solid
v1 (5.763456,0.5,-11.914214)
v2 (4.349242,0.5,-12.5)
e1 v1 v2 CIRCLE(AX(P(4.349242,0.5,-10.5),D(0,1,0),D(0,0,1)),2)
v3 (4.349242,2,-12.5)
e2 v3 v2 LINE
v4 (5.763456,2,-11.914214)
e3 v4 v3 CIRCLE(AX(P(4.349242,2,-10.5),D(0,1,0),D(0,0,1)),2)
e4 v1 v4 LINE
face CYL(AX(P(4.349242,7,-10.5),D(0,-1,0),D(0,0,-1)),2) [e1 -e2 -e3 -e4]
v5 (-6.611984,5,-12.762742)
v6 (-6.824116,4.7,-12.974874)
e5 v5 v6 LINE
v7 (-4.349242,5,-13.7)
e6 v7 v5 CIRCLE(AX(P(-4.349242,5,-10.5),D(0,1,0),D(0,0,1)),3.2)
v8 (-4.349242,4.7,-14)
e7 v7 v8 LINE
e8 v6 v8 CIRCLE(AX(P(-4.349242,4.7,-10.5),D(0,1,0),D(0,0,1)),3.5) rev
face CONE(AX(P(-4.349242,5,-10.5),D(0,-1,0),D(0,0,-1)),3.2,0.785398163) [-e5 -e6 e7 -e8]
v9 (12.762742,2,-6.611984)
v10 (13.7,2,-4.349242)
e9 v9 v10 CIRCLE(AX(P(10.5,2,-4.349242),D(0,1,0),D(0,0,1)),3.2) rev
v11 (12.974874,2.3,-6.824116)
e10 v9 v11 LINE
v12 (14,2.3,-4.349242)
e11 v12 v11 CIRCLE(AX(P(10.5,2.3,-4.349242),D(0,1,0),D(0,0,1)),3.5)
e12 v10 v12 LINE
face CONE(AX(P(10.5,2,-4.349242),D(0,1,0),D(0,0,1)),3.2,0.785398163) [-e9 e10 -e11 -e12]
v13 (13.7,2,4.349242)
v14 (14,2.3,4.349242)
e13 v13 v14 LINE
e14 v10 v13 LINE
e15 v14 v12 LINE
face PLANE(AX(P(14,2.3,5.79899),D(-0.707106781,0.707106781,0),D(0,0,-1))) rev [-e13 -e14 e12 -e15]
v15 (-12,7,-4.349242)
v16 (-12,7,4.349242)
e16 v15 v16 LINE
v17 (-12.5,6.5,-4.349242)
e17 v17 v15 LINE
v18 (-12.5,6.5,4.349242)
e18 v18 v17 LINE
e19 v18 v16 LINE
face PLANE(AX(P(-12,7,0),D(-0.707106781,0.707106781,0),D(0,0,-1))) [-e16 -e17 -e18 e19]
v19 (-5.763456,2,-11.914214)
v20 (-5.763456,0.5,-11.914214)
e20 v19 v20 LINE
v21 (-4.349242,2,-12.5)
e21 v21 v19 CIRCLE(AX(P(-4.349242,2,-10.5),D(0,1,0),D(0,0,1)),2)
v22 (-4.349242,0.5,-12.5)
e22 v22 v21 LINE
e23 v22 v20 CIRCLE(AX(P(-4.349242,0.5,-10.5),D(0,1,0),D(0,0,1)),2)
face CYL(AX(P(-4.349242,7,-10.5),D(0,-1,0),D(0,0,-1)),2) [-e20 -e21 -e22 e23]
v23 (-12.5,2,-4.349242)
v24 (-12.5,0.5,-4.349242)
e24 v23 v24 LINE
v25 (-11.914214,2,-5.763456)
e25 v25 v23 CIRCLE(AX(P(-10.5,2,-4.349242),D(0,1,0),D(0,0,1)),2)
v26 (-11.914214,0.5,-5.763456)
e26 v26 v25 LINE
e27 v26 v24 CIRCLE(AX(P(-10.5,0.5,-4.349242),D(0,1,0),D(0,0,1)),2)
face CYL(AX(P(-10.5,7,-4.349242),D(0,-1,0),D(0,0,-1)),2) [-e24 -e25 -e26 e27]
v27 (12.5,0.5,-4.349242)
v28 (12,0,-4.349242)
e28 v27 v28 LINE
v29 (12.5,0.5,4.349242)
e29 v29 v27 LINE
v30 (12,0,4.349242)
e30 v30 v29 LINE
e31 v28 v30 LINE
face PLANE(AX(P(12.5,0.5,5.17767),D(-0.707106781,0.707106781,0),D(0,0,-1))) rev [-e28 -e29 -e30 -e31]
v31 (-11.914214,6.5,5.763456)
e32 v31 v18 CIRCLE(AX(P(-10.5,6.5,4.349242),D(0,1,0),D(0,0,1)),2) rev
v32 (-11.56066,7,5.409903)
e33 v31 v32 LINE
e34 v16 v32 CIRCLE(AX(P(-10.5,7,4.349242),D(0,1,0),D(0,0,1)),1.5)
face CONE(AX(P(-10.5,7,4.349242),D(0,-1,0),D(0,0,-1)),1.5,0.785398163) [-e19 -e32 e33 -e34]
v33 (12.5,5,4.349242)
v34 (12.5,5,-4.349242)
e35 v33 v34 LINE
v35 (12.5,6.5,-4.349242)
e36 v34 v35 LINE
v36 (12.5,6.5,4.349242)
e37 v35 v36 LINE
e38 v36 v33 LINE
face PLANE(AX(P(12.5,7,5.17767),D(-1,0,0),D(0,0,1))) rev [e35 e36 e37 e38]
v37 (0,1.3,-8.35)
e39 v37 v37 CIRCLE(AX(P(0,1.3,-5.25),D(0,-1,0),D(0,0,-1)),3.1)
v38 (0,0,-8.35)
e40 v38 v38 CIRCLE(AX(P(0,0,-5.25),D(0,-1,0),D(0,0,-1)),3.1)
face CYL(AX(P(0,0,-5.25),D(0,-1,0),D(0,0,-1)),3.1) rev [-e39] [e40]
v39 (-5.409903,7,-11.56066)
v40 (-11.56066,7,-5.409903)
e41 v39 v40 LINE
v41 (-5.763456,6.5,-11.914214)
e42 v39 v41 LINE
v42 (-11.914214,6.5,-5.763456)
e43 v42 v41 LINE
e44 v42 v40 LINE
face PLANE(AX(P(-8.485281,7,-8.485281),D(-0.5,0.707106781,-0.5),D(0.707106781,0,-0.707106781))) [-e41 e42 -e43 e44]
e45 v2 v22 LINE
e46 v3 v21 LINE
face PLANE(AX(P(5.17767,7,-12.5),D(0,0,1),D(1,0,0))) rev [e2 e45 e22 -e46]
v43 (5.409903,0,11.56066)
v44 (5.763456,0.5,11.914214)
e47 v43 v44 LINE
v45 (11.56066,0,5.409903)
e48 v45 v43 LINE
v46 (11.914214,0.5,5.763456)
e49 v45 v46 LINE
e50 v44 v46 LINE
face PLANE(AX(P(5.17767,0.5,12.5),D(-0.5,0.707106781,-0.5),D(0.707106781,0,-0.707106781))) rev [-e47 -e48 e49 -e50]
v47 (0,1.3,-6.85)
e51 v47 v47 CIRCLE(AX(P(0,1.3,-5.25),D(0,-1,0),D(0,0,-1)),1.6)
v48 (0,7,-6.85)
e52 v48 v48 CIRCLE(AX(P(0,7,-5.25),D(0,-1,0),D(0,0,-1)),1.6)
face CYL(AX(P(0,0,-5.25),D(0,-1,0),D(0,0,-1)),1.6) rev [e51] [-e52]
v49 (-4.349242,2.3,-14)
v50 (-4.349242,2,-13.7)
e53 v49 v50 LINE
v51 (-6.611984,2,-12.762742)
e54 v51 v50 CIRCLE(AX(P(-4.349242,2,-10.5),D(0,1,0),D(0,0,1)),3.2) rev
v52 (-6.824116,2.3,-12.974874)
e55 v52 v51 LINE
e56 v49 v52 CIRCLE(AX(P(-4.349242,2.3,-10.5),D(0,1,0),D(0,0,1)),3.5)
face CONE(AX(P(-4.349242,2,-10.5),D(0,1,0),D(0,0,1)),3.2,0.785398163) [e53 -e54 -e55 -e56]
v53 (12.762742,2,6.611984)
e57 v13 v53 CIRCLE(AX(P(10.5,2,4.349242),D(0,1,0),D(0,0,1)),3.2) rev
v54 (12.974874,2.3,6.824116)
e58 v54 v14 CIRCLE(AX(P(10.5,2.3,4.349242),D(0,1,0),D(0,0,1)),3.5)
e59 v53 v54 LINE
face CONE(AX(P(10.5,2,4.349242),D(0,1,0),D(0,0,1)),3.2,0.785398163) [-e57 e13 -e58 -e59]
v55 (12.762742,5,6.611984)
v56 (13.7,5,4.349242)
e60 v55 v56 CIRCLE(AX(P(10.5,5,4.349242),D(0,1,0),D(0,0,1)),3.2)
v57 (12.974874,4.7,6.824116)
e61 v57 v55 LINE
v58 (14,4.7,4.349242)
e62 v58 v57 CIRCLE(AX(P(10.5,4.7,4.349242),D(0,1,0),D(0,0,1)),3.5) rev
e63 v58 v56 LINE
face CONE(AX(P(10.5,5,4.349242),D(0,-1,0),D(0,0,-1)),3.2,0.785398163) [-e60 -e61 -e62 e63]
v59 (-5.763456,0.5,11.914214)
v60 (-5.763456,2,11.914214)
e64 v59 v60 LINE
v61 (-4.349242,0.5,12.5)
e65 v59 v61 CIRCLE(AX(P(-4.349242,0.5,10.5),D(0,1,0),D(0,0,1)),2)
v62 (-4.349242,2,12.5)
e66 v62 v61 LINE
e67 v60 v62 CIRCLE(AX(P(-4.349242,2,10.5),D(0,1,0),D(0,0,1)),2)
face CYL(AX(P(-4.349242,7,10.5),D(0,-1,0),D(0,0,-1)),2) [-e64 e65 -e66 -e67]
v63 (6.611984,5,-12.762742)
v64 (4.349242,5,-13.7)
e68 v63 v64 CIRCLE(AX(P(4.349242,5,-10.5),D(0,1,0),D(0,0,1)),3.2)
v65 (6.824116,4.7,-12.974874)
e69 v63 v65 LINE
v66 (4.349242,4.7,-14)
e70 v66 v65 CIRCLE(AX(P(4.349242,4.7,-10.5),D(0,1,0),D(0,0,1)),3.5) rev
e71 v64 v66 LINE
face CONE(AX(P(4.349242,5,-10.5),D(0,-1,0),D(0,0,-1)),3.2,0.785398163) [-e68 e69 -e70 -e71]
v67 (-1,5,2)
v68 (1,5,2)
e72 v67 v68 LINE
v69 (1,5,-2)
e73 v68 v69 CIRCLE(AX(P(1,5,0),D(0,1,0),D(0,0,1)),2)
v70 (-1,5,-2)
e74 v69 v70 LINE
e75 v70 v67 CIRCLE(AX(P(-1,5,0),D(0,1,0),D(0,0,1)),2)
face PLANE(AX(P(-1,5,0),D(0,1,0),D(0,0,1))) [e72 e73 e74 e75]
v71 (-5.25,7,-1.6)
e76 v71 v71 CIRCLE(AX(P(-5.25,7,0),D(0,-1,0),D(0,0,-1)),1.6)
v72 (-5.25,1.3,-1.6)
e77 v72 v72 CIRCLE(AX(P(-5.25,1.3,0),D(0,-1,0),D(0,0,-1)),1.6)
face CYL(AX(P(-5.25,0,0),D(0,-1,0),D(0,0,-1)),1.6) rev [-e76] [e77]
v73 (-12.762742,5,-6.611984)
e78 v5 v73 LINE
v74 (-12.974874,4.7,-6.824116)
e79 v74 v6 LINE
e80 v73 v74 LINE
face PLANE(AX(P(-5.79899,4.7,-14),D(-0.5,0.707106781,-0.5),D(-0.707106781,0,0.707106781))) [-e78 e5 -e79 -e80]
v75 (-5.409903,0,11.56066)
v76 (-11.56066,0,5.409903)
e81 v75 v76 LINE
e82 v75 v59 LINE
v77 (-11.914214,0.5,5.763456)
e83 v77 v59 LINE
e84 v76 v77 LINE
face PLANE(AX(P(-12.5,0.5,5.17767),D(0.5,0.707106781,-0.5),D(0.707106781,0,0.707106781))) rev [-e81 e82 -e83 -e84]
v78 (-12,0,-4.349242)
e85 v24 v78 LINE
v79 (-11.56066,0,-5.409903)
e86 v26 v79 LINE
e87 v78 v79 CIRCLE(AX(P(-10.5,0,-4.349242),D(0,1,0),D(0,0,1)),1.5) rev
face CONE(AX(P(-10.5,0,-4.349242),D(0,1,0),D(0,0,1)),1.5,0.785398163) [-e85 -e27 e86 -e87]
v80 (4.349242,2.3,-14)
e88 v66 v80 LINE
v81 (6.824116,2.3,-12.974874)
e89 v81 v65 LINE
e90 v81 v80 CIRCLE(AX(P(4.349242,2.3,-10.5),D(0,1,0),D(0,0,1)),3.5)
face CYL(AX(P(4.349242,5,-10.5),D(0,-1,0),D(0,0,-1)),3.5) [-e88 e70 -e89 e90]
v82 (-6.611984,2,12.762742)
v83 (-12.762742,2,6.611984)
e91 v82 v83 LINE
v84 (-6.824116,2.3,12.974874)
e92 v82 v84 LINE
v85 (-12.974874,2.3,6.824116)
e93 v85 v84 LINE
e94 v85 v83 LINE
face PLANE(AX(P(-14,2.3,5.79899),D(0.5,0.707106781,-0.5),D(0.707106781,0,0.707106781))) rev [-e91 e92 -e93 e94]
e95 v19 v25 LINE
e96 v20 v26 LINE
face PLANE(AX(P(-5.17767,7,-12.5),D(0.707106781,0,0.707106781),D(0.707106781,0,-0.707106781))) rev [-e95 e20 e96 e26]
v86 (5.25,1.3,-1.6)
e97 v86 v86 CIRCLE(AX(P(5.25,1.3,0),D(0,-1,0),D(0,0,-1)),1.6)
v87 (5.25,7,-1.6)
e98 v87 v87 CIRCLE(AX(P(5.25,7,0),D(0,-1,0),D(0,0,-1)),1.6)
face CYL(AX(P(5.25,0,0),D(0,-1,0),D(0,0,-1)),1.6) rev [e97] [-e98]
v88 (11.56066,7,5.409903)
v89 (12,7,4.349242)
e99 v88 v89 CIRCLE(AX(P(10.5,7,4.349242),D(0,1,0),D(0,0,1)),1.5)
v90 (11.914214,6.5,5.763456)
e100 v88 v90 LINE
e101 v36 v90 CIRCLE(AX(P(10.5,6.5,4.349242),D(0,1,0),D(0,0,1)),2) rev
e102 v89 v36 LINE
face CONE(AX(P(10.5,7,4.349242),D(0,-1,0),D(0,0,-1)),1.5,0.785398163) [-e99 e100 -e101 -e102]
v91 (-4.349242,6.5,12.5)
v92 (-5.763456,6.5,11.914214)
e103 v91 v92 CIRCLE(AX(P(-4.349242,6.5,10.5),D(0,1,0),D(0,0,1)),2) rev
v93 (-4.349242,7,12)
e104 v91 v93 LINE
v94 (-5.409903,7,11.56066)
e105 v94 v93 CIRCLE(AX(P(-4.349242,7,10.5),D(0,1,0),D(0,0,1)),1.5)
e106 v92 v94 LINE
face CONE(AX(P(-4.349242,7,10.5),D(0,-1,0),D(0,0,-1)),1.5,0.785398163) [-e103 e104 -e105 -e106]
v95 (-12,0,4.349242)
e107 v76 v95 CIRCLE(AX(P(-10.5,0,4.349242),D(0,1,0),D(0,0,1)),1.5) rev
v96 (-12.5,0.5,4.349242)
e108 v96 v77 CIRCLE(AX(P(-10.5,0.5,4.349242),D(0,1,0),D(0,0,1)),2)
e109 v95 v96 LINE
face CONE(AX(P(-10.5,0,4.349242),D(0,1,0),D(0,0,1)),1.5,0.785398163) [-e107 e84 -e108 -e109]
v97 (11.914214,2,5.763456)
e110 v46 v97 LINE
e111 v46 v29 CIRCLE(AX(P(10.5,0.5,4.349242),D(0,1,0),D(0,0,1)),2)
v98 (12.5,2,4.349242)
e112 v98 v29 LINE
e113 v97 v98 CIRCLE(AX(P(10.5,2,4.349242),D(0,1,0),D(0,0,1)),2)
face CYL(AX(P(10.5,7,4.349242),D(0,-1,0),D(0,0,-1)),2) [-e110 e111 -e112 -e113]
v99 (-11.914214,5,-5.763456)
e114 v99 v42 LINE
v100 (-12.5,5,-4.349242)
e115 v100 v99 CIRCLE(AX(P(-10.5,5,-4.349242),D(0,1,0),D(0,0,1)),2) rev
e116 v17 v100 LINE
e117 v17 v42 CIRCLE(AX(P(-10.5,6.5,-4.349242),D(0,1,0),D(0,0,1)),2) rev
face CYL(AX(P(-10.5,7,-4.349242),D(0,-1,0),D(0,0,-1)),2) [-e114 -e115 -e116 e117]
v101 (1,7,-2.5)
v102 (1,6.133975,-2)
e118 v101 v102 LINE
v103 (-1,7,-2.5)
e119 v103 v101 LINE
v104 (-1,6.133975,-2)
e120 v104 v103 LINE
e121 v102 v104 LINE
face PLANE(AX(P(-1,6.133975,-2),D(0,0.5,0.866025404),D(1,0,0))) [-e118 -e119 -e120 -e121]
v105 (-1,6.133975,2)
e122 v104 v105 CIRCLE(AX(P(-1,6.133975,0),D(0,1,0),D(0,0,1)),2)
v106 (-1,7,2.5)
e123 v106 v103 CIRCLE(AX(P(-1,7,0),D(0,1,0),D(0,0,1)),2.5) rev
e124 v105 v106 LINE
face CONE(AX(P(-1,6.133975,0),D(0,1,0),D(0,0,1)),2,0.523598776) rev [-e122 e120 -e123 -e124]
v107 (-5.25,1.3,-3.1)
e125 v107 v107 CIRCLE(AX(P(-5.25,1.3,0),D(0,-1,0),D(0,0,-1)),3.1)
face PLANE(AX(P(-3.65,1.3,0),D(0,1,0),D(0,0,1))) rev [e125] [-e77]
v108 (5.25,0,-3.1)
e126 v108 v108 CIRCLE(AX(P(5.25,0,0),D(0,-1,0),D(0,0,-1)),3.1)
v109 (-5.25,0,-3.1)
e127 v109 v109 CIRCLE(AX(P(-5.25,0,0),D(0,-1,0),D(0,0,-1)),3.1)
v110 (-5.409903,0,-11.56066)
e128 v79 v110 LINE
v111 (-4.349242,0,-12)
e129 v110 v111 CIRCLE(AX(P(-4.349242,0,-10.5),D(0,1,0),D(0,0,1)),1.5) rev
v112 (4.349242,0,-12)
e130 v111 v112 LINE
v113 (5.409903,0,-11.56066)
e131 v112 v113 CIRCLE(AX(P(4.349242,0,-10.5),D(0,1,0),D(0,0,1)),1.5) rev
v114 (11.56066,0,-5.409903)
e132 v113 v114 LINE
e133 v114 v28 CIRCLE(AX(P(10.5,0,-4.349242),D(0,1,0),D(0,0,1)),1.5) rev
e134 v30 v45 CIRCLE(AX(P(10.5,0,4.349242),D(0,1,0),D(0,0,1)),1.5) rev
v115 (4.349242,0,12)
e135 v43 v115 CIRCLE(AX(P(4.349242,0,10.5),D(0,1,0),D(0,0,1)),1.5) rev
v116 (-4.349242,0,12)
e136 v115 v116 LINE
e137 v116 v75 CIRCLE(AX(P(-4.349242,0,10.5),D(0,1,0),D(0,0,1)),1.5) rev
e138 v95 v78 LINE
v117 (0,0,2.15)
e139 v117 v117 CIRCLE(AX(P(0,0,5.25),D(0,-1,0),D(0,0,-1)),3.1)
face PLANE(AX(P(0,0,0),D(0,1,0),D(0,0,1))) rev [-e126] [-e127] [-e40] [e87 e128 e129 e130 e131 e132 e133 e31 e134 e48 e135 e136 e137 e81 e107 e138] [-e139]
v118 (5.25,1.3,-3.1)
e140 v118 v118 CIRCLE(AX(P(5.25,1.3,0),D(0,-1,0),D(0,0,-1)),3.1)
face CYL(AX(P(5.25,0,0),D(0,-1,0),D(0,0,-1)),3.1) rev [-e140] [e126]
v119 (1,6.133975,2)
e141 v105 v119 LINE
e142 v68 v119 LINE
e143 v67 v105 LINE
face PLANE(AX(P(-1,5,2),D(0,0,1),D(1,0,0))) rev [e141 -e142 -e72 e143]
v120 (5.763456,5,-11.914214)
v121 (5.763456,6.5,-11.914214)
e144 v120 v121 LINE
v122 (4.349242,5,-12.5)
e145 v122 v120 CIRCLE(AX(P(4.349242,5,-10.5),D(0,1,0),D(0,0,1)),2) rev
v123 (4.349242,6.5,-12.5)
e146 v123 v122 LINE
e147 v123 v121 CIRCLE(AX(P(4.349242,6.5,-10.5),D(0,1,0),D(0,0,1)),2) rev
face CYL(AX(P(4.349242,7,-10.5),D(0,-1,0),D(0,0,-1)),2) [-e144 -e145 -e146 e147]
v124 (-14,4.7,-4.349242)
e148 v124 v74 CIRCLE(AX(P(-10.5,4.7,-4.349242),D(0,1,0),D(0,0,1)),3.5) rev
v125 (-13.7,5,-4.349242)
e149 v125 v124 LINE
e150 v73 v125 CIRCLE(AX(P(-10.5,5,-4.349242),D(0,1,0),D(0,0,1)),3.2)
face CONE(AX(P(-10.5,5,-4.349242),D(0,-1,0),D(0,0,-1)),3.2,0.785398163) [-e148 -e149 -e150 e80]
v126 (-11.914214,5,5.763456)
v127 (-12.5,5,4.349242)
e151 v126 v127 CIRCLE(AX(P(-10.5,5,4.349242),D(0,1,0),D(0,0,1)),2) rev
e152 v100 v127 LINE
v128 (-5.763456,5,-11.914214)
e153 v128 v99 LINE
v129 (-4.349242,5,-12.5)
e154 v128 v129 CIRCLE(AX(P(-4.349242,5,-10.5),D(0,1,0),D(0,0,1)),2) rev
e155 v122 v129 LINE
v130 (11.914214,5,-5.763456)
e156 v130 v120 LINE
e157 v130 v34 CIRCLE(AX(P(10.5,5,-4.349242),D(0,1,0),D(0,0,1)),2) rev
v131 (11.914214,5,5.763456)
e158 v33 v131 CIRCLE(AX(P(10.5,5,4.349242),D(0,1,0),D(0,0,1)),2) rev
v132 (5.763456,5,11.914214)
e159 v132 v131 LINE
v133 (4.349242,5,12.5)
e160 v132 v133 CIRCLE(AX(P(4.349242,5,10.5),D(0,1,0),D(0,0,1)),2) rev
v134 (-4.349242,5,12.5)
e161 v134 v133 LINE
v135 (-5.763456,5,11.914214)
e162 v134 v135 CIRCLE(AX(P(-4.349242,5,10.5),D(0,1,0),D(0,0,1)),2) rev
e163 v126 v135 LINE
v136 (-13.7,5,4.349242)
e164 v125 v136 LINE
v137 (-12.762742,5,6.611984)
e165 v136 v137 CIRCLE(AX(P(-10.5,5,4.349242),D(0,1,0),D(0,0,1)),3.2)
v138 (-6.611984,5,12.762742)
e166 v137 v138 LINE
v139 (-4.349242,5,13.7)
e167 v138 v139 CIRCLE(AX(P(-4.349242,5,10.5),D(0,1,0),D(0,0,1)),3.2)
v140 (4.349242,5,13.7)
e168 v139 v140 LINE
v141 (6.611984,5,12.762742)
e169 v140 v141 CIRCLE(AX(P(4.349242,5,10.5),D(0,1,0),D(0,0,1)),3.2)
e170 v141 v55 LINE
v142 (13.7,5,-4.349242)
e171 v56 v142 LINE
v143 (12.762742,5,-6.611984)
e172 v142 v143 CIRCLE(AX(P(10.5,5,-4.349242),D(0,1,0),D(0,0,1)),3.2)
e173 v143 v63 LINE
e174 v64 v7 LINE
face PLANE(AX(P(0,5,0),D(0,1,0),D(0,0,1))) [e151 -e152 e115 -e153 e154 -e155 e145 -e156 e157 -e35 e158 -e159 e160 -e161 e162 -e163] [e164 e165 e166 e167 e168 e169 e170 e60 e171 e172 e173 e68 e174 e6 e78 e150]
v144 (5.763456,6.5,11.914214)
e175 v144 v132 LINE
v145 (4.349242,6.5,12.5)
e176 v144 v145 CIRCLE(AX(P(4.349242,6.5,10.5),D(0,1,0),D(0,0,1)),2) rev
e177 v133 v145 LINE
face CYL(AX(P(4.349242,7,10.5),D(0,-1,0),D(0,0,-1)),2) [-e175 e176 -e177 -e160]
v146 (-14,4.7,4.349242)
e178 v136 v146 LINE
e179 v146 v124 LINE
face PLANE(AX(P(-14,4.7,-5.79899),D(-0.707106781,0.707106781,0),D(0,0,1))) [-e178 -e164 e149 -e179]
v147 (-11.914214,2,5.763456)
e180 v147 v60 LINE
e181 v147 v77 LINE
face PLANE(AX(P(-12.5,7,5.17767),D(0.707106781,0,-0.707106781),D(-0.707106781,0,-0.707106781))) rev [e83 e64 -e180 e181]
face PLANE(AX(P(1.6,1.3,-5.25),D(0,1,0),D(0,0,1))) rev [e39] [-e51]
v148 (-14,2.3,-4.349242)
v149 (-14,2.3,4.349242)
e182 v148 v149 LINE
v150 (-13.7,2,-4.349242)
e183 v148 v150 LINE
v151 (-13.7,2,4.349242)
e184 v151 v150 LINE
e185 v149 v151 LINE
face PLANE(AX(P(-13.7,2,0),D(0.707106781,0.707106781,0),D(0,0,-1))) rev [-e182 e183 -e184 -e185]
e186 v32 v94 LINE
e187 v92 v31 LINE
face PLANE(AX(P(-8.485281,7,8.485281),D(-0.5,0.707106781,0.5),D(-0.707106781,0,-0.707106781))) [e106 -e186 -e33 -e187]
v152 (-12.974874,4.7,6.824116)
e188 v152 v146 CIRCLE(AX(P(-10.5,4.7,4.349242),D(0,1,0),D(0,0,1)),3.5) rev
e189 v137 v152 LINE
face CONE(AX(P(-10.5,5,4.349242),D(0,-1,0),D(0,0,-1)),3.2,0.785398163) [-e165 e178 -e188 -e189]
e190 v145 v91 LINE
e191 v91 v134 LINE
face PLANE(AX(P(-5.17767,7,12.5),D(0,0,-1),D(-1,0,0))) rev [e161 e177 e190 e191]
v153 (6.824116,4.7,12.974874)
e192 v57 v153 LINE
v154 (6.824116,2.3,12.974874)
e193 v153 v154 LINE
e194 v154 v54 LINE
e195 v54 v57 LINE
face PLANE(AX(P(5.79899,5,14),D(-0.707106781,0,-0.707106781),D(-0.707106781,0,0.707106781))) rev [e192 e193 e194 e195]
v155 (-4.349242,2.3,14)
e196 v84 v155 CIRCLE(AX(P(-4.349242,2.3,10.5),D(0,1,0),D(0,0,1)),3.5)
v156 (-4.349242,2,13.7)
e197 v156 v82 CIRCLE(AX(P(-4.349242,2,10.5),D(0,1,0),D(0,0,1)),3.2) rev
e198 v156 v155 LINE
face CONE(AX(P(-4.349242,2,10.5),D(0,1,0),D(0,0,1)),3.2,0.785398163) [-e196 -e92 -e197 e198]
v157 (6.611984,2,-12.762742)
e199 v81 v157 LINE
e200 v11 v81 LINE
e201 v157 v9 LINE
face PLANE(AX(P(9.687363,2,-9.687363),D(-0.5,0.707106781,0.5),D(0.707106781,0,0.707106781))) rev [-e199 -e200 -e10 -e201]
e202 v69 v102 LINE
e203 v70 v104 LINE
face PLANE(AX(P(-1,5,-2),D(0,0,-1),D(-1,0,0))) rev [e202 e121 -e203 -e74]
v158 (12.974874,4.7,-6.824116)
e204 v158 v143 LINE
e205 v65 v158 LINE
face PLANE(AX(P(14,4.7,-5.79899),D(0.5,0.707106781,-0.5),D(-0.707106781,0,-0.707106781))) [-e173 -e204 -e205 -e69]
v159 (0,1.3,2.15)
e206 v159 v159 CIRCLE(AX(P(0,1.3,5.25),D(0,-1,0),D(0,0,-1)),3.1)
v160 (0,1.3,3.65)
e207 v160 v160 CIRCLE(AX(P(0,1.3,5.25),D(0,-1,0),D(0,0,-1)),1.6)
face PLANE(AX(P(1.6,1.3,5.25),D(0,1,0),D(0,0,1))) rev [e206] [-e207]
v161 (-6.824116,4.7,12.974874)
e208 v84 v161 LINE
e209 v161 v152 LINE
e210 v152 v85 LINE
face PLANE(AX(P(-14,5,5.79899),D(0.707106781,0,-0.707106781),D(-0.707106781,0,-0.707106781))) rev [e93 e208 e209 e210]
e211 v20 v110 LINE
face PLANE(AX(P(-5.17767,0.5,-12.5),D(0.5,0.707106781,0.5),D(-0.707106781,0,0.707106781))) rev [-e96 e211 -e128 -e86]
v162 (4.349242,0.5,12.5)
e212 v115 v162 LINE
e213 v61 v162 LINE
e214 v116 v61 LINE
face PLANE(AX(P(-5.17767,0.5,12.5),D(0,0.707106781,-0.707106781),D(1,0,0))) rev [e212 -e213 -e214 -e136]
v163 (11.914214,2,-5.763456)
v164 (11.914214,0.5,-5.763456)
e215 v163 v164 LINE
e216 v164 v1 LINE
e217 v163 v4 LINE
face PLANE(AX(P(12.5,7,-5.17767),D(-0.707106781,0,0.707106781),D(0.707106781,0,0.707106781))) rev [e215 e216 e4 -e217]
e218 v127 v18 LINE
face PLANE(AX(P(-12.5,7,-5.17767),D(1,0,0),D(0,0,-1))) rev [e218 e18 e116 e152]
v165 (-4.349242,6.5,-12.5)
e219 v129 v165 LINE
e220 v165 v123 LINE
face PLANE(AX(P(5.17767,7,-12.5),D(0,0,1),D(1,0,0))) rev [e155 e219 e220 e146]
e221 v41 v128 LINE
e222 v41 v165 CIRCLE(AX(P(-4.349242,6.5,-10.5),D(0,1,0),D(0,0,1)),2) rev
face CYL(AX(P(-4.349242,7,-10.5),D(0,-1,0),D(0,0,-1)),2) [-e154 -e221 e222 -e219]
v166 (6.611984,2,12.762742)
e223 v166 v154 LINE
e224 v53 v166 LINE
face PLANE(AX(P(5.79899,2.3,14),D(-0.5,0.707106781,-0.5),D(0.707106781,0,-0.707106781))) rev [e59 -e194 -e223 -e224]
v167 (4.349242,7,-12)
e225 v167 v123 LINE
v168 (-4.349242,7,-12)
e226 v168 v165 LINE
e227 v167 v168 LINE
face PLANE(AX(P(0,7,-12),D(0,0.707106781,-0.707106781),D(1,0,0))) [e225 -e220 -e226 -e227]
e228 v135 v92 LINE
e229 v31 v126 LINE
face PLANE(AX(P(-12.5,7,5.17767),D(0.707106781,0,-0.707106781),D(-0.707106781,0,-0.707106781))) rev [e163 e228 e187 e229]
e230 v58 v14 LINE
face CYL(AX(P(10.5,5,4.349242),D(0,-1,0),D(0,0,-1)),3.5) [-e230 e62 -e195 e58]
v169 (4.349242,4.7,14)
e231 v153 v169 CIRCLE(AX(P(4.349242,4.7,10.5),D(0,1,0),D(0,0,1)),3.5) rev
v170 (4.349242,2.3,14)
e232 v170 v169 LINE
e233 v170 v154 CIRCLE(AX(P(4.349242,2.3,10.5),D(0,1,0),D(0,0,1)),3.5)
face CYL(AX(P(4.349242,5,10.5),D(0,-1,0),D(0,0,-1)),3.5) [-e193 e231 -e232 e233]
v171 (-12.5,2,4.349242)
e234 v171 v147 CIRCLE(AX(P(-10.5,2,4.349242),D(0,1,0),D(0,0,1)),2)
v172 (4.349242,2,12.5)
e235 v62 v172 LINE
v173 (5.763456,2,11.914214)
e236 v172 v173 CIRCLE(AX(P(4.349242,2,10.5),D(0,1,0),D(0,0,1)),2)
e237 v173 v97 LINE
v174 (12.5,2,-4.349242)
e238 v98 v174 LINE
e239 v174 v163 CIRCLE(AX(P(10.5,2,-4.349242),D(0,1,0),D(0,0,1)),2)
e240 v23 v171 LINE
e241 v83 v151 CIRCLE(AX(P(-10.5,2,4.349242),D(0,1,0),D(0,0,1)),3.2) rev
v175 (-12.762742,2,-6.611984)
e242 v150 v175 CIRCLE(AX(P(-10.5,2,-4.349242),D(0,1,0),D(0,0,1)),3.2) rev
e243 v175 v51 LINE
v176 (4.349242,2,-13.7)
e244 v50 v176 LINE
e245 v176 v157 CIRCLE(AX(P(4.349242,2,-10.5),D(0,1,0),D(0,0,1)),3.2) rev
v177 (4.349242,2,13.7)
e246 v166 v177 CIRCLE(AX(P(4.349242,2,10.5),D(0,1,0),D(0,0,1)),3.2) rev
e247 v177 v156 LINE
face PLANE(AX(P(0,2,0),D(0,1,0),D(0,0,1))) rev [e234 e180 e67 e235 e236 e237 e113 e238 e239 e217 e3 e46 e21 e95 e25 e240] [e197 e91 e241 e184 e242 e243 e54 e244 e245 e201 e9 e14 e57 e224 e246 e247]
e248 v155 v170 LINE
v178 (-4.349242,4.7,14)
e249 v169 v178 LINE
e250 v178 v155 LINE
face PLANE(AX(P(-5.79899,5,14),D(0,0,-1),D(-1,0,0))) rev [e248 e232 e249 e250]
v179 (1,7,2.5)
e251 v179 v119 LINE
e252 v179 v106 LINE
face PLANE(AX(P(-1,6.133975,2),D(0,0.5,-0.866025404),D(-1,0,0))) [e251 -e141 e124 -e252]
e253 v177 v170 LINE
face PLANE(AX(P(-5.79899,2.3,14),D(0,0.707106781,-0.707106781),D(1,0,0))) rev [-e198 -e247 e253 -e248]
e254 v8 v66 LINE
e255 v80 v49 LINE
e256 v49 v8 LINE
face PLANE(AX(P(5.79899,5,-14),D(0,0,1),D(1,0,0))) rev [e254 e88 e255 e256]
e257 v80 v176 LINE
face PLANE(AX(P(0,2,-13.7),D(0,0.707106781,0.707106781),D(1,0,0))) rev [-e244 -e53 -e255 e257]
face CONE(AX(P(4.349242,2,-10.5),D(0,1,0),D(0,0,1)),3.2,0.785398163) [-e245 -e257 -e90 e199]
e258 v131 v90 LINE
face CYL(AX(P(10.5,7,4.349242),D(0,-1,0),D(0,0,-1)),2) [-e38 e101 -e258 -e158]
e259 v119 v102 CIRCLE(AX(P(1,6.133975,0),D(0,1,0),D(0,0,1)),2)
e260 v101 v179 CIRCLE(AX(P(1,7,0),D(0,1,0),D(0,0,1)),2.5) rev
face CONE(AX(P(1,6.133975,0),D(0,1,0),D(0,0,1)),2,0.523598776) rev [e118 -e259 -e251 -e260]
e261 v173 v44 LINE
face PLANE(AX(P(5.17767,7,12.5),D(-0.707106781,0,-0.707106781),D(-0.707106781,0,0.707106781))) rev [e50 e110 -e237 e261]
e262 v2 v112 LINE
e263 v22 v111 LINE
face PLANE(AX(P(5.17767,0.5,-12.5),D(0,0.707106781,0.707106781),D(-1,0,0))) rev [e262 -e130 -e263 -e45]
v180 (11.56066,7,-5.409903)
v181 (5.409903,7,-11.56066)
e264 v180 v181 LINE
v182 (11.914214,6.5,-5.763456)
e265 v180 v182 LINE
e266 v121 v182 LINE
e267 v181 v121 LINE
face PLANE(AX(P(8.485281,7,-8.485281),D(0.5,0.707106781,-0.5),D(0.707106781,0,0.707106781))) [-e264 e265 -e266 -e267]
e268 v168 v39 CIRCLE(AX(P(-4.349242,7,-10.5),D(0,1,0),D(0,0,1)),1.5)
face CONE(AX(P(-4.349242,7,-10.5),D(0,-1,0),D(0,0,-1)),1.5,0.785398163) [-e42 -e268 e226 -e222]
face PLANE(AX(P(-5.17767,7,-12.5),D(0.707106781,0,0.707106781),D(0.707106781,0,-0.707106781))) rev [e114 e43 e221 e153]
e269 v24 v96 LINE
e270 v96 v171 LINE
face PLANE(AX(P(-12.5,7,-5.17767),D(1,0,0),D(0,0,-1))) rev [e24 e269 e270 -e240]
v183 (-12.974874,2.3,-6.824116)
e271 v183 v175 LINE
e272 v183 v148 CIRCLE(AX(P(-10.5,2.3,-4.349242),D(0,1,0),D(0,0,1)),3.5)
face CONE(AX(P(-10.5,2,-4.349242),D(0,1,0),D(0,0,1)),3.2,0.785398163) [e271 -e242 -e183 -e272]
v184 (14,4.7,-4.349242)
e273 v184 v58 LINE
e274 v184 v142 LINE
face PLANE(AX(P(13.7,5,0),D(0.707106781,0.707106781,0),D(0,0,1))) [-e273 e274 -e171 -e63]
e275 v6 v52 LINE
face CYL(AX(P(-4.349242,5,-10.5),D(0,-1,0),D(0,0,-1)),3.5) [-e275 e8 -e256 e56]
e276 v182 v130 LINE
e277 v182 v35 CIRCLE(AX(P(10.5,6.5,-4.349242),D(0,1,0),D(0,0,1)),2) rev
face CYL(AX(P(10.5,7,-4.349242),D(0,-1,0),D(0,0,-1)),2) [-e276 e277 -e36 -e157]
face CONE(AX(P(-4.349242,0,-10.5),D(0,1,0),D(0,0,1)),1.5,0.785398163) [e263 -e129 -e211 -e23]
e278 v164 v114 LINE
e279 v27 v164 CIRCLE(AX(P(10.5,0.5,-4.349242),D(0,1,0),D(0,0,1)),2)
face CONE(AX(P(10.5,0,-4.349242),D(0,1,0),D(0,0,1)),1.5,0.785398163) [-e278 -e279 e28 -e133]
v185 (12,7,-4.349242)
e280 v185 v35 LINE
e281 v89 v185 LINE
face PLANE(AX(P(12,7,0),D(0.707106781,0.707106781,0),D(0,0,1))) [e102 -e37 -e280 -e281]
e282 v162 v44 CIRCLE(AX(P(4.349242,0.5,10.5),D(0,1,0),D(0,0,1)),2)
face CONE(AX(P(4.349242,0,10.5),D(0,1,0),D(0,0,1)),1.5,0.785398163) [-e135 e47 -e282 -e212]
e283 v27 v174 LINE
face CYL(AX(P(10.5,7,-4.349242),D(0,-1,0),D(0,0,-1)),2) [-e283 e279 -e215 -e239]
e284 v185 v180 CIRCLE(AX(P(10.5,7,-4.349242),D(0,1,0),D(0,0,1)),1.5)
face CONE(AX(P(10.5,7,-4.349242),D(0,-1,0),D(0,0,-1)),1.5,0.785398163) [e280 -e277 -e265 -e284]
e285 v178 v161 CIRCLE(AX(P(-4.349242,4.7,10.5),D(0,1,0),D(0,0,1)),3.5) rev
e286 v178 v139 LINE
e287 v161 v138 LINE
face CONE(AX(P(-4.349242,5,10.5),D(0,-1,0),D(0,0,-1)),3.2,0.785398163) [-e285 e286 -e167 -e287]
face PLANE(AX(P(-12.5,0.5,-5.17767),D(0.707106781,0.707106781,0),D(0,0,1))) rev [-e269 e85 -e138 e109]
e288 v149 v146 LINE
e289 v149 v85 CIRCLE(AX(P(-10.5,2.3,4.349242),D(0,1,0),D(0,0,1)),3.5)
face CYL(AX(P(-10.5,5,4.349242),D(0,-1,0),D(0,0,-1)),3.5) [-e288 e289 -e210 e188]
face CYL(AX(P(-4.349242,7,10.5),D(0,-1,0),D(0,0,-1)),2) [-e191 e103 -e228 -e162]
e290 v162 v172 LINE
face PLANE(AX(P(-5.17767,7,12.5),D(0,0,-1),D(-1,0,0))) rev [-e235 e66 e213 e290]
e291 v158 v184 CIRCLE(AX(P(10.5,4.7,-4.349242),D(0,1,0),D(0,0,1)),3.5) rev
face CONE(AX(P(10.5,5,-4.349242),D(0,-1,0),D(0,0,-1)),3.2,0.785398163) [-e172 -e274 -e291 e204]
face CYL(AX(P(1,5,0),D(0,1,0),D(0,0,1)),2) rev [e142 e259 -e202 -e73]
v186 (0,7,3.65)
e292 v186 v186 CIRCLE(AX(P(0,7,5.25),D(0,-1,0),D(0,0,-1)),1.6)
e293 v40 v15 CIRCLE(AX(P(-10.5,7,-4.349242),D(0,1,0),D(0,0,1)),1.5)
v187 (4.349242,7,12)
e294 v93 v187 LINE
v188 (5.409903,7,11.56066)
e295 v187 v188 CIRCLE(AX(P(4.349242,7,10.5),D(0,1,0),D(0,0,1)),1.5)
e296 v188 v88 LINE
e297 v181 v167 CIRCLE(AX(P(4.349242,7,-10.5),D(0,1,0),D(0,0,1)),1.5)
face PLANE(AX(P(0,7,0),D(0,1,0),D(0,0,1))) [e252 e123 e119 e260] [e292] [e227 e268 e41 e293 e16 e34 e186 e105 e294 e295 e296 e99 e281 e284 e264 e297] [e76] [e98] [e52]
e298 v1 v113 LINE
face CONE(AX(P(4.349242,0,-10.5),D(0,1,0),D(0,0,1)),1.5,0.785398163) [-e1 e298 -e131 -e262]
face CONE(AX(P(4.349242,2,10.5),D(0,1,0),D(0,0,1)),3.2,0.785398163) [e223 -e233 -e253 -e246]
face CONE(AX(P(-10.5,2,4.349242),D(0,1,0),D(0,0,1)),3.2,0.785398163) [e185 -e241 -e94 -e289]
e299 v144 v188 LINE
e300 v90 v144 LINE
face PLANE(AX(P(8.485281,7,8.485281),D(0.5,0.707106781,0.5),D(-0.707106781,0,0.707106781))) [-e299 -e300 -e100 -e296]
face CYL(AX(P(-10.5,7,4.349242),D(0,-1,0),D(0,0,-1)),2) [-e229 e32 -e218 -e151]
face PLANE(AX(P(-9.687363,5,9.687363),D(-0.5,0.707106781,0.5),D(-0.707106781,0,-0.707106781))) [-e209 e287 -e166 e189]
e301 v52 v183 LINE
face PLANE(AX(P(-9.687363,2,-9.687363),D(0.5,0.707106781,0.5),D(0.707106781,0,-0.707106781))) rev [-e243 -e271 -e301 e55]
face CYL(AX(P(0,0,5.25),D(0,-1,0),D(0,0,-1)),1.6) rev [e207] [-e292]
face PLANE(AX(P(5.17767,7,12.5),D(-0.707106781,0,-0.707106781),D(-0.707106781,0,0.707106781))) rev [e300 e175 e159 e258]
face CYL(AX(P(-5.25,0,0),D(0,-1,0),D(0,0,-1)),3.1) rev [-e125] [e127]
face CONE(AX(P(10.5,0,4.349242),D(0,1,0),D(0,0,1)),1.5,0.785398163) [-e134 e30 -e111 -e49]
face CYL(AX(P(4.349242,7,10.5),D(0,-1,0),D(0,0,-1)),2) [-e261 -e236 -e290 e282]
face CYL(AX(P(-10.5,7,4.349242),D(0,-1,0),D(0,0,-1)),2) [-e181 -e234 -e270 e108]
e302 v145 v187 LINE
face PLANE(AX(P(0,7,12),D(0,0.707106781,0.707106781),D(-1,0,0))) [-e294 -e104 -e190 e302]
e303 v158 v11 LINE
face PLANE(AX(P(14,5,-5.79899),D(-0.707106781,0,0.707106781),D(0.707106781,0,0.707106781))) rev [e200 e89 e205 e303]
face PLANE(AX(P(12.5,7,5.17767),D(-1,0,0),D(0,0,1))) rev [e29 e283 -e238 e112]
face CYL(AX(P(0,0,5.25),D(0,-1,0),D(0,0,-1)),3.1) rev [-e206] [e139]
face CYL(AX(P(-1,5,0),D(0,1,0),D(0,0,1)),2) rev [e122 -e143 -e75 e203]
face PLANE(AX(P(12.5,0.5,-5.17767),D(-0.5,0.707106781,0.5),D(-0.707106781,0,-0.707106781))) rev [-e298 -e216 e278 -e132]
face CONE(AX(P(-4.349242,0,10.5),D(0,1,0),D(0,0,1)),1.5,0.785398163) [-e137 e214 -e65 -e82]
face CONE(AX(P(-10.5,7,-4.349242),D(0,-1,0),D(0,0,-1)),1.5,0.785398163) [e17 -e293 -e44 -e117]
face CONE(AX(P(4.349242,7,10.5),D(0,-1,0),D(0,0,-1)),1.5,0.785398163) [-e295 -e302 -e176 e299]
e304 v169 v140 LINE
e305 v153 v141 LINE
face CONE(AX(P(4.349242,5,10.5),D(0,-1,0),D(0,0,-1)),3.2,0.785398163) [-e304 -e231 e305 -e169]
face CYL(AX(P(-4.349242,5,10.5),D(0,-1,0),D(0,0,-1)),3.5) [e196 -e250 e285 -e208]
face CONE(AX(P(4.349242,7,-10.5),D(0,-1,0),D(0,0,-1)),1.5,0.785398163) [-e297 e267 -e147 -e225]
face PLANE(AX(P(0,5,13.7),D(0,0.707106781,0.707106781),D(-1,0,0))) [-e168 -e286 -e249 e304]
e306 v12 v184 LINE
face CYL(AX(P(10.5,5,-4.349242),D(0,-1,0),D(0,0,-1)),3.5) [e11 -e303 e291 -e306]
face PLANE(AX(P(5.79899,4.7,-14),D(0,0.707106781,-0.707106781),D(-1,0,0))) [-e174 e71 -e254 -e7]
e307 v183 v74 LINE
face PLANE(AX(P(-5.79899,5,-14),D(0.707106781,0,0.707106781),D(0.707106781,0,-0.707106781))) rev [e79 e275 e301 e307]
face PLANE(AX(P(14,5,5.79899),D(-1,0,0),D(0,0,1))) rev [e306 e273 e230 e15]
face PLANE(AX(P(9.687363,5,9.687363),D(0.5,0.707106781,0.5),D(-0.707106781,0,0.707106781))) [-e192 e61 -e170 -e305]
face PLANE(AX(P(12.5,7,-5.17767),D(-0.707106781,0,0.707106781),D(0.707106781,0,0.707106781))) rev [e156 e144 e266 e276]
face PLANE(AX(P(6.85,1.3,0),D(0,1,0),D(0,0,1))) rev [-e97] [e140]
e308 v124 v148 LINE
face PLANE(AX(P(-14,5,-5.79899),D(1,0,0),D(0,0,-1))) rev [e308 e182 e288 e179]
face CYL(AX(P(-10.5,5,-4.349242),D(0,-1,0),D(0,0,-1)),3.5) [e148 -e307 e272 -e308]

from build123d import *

# Parameters (mm, degrees)
EXTRUDE_1_DEPTH              = 7
HOLE_WIZARD_M3_2_D           = 3.2
HOLE_WIZARD_M3_2_DEPTH       = 7
HOLE_WIZARD_M3_2_CBORE_D     = 6.2
HOLE_WIZARD_M3_2_CBORE_DEPTH = 1.3
HOLE_WIZARD_M3_2_TIP         = 0.96137699
CUT_EXTRUDE_1_DEPTH          = 2
EXTRUDE_START                = -3.5
EXTRUDE_3_DEPTH              = 1.5
FILLET_1_R                   = 2
CHAMFER_1_SIZE               = 0.5
CHAMFER_1_SIZE2              = 0.866025404
FILLET_2_R                   = 1
CHAMFER_2_SIZE               = 0.5
DELETE_START                 = 2
DELETE_FACE_1_DEPTH          = 3
DELETE_FACE_2_DEPTH          = 3
FILLET_3_R                   = 3.5
CHAMFER_3_SIZE               = 0.3


with BuildPart() as part:
    # 草图1 → 凸台-拉伸1 (new body)
    with BuildSketch(Plane(origin=(0, 0, 0), x_dir=(1, 0, 0), z_dir=(0, 1, 0))):
        Polygon((12.5, -5.17766953), (12.5, 5.17766953), (5.17766953, 12.5), (-5.17766953, 12.5), (-12.5, 5.17766953), (-12.5, -5.17766953), (-5.17766953, -12.5), (5.17766953, -12.5), align=None)
    extrude(amount=EXTRUDE_1_DEPTH)

    # M3 六角圆柱头螺钉的柱形沉头孔2
    with Locations(Plane.XZ):
        with Locations((-5.25, 0), (0, 5.25), (5.25, 0), (0, -5.25)):
            CounterBoreHole(HOLE_WIZARD_M3_2_D / 2, HOLE_WIZARD_M3_2_CBORE_D / 2, HOLE_WIZARD_M3_2_CBORE_DEPTH, depth=HOLE_WIZARD_M3_2_DEPTH)
            with Locations((0, 0, -(HOLE_WIZARD_M3_2_DEPTH + HOLE_WIZARD_M3_2_TIP / 2))):  # 118° drill point
                Cone(0, HOLE_WIZARD_M3_2_D / 2, HOLE_WIZARD_M3_2_TIP, mode=Mode.SUBTRACT)

    # 草图7 → 切除-拉伸1 (cut)
    with BuildSketch(Plane(origin=(0, 7, 0), x_dir=(1, 0, 0), z_dir=(0, 1, 0))):
        with BuildLine():
            Line((-1, 2), (1, 2))
            ThreePointArc((1, 2), (3, 0), (1, -2))
            Line((1, -2), (-1, -2))
            ThreePointArc((-1, -2), (-3, 0), (-1, 2))
        make_face()
    extrude(amount=-CUT_EXTRUDE_1_DEPTH, mode=Mode.SUBTRACT)

    # 草图8 → 凸台-拉伸3 (add, symmetric)
    with BuildSketch(Plane(origin=(0, 7, 0), x_dir=(1, 0, 0), z_dir=(0, 1, 0)).offset(EXTRUDE_START)):
        Polygon((5.798989873, 14), (-5.798989873, 14), (-14, 5.798989873), (-14, -5.798989873), (-5.798989873, -14), (5.798989873, -14), (14, -5.798989873), (14, 5.798989873), align=None)
        Polygon((12.5, 5.17766953), (5.17766953, 12.5), (-5.17766953, 12.5), (-12.5, 5.17766953), (-12.5, -5.17766953), (-5.17766953, -12.5), (5.17766953, -12.5), (12.5, -5.17766953), align=None, mode=Mode.SUBTRACT)
    extrude(amount=EXTRUDE_3_DEPTH, both=True)

    # 圆角1
    fillet_1_edges = [part.edges().sort_by_distance(p)[0] for p in [
        (5.17766953, 6, 12.5),
        (-5.17766953, 6, 12.5),
        (-12.5, 6, 5.17766953),
        (-12.5, 6, -5.17766953),
        (-5.17766953, 6, -12.5),
        (5.17766953, 6, -12.5),
        (12.5, 6, -5.17766953),
        (12.5, 6, 5.17766953),
        (5.17766953, 1, 12.5),
        (-5.17766953, 1, 12.5),
        (-12.5, 1, 5.17766953),
        (-12.5, 1, -5.17766953),
        (-5.17766953, 1, -12.5),
        (5.17766953, 1, -12.5),
        (12.5, 1, -5.17766953),
        (12.5, 1, 5.17766953),
        (14, 3.5, -5.798989873),
        (5.798989873, 3.5, -14),
        (-5.798989873, 3.5, -14),
        (-14, 3.5, -5.798989873),
        (-14, 3.5, 5.798989873),
        (-5.798989873, 3.5, 14),
        (5.798989873, 3.5, 14),
        (14, 3.5, 5.798989873),
    ]]
    fillet(fillet_1_edges, radius=FILLET_1_R)

    # 倒角1
    chamfer_1_edges = [part.edges().sort_by_distance(p)[0] for p in [
        (-3, 7, 0),
        (0, 7, 2),
        (3, 7, 0),
        (0, 7, -2),
    ]]
    chamfer_1_side = [part.faces().sort_by_distance(p)[0] for p in [
        (12.146446609, 7, 0),
    ]]
    chamfer(chamfer_1_edges, length=CHAMFER_1_SIZE, length2=CHAMFER_1_SIZE2, reference=chamfer_1_side[0])

    # 圆角2
    fillet_2_edges = [part.edges().sort_by_distance(p)[0] for p in [
        (9.899494937, 2, -9.899494937),
        (9.899494937, 5, -9.899494937),
        (14, 2, 0),
        (9.899494937, 2, 9.899494937),
        (0, 2, 14),
        (-9.899494937, 2, 9.899494937),
        (-14, 2, 0),
        (-9.899494937, 2, -9.899494937),
        (0, 2, -14),
        (-13.847759065, 2, -5.735929613),
        (5.735929613, 2, -13.847759065),
        (-5.735929613, 2, -13.847759065),
        (-13.847759065, 2, 5.735929613),
        (-5.735929613, 2, 13.847759065),
        (5.735929613, 2, 13.847759065),
        (13.847759065, 2, 5.735929613),
        (13.847759065, 2, -5.735929613),
        (14, 5, 0),
        (0, 5, -14),
        (-9.899494937, 5, -9.899494937),
        (-14, 5, 0),
        (-9.899494937, 5, 9.899494937),
        (0, 5, 14),
        (9.899494937, 5, 9.899494937),
        (-13.847759065, 5, -5.735929613),
        (5.735929613, 5, -13.847759065),
        (-5.735929613, 5, -13.847759065),
        (-13.847759065, 5, 5.735929613),
        (-5.735929613, 5, 13.847759065),
        (5.735929613, 5, 13.847759065),
        (13.847759065, 5, 5.735929613),
        (13.847759065, 5, -5.735929613),
    ]]
    fillet(fillet_2_edges, radius=FILLET_2_R)

    # 倒角2
    chamfer_2_edges = [part.edges().sort_by_distance(p)[0] for p in [
        (12.5, 0, 0),
        (8.838834765, 0, 8.838834765),
        (0, 0, 12.5),
        (-8.838834765, 0, 8.838834765),
        (-12.5, 0, 0),
        (-8.838834765, 0, -8.838834765),
        (0, 0, -12.5),
        (8.838834765, 0, -8.838834765),
        (-12.347759065, 0, -5.11460927),
        (12.347759065, 0, -5.11460927),
        (5.11460927, 0, -12.347759065),
        (-5.11460927, 0, -12.347759065),
        (-12.347759065, 0, 5.11460927),
        (-5.11460927, 0, 12.347759065),
        (5.11460927, 0, 12.347759065),
        (12.347759065, 0, 5.11460927),
        (0, 7, 12.5),
        (-8.838834765, 7, 8.838834765),
        (8.838834765, 7, 8.838834765),
        (12.5, 7, 0),
        (8.838834765, 7, -8.838834765),
        (0, 7, -12.5),
        (-8.838834765, 7, -8.838834765),
        (-12.5, 7, 0),
        (12.347759065, 7, 5.11460927),
        (5.11460927, 7, 12.347759065),
        (12.347759065, 7, -5.11460927),
        (5.11460927, 7, -12.347759065),
        (-5.11460927, 7, -12.347759065),
        (-12.347759065, 7, -5.11460927),
        (-12.347759065, 7, 5.11460927),
        (-5.11460927, 7, 12.347759065),
    ]]
    chamfer(chamfer_2_edges, length=CHAMFER_2_SIZE)

    # Delete Face 1: read off the stored shape, not the designer's step
    # Delete Face 1 outline → Delete Face 1 (add)
    with BuildSketch(Plane(origin=(0, 0, 0), x_dir=(1, 0, 0), z_dir=(0, 1, 0)).offset(DELETE_START)):
        with BuildLine():
            ThreePointArc((13.414213562, -6.384776311), (13.847759065, -5.735929613), (14, -4.970562748))
            Line((14, -4.970562748), (14, 4.970562748))
            ThreePointArc((14, 4.970562748), (13.847759065, 5.735929613), (13.414213562, 6.384776311))
            Line((13.414213562, 6.384776311), (6.384776311, 13.414213562))
            ThreePointArc((6.384776311, 13.414213562), (5.735929613, 13.847759065), (4.970562748, 14))
            Line((4.970562748, 14), (-4.970562748, 14))
            ThreePointArc((-4.970562748, 14), (-5.735929613, 13.847759065), (-6.384776311, 13.414213562))
            Line((-6.384776311, 13.414213562), (-13.414213562, 6.384776311))
            ThreePointArc((-13.414213562, 6.384776311), (-13.847759065, 5.735929613), (-14, 4.970562748))
            Line((-14, 4.970562748), (-14, -4.970562748))
            ThreePointArc((-14, -4.970562748), (-13.847759065, -5.735929613), (-13.414213562, -6.384776311))
            Line((-13.414213562, -6.384776311), (-6.384776311, -13.414213562))
            ThreePointArc((-6.384776311, -13.414213562), (-5.735929613, -13.847759065), (-4.970562748, -14))
            Line((-4.970562748, -14), (4.970562748, -14))
            ThreePointArc((4.970562748, -14), (5.735929613, -13.847759065), (6.384776311, -13.414213562))
            Line((6.384776311, -13.414213562), (13.414213562, -6.384776311))
        make_face()
        with BuildLine():
            ThreePointArc((4.349242405, 12.5), (5.11460927, 12.347759065), (5.763455967, 11.914213562))
            Line((5.763455967, 11.914213562), (11.914213562, 5.763455967))
            ThreePointArc((11.914213562, 5.763455967), (12.347759065, 5.11460927), (12.5, 4.349242405))
            Line((12.5, 4.349242405), (12.5, -4.349242405))
            ThreePointArc((12.5, -4.349242405), (12.347759065, -5.11460927), (11.914213562, -5.763455967))
            Line((11.914213562, -5.763455967), (5.763455967, -11.914213562))
            ThreePointArc((5.763455967, -11.914213562), (5.11460927, -12.347759065), (4.349242405, -12.5))
            Line((4.349242405, -12.5), (-4.349242405, -12.5))
            ThreePointArc((-4.349242405, -12.5), (-5.11460927, -12.347759065), (-5.763455967, -11.914213562))
            Line((-5.763455967, -11.914213562), (-11.914213562, -5.763455967))
            ThreePointArc((-11.914213562, -5.763455967), (-12.347759065, -5.11460927), (-12.5, -4.349242405))
            Line((-12.5, -4.349242405), (-12.5, 4.349242405))
            ThreePointArc((-12.5, 4.349242405), (-12.347759065, 5.11460927), (-11.914213562, 5.763455967))
            Line((-11.914213562, 5.763455967), (-5.763455967, 11.914213562))
            ThreePointArc((-5.763455967, 11.914213562), (-5.11460927, 12.347759065), (-4.349242405, 12.5))
            Line((-4.349242405, 12.5), (4.349242405, 12.5))
        make_face(mode=Mode.SUBTRACT)
    extrude(amount=DELETE_FACE_1_DEPTH)

    # Delete Face 2: read off the stored shape, not the designer's step
    # Delete Face 2 outline → Delete Face 2 (add)
    with BuildSketch(Plane(origin=(0, 0, 0), x_dir=(1, 0, 0), z_dir=(0, 1, 0)).offset(DELETE_START)):
        with BuildLine():
            Line((14, 5.798989873), (13.414213562, 6.384776311))
            ThreePointArc((13.414213562, 6.384776311), (13.847759065, 5.735929613), (14, 4.970562748))
            Line((14, 4.970562748), (14, 5.798989873))
        make_face()
        with BuildLine():
            ThreePointArc((4.970562748, 14), (5.735929613, 13.847759065), (6.384776311, 13.414213562))
            Line((6.384776311, 13.414213562), (5.798989873, 14))
            Line((5.798989873, 14), (4.970562748, 14))
        make_face()
        with BuildLine():
            Line((14, -5.798989873), (14, -4.970562748))
            ThreePointArc((14, -4.970562748), (13.847759065, -5.735929613), (13.414213562, -6.384776311))
            Line((13.414213562, -6.384776311), (14, -5.798989873))
        make_face()
        with BuildLine():
            ThreePointArc((-6.384776311, 13.414213562), (-5.735929613, 13.847759065), (-4.970562748, 14))
            Line((-4.970562748, 14), (-5.798989873, 14))
            Line((-5.798989873, 14), (-6.384776311, 13.414213562))
        make_face()
        with BuildLine():
            Line((5.798989873, -14), (6.384776311, -13.414213562))
            ThreePointArc((6.384776311, -13.414213562), (5.735929613, -13.847759065), (4.970562748, -14))
            Line((4.970562748, -14), (5.798989873, -14))
        make_face()
        with BuildLine():
            ThreePointArc((-14, 4.970562748), (-13.847759065, 5.735929613), (-13.414213562, 6.384776311))
            Line((-13.414213562, 6.384776311), (-14, 5.798989873))
            Line((-14, 5.798989873), (-14, 4.970562748))
        make_face()
        with BuildLine():
            Line((-5.798989873, -14), (-4.970562748, -14))
            ThreePointArc((-4.970562748, -14), (-5.735929613, -13.847759065), (-6.384776311, -13.414213562))
            Line((-6.384776311, -13.414213562), (-5.798989873, -14))
        make_face()
        with BuildLine():
            ThreePointArc((-13.414213562, -6.384776311), (-13.847759065, -5.735929613), (-14, -4.970562748))
            Line((-14, -4.970562748), (-14, -5.798989873))
            Line((-14, -5.798989873), (-13.414213562, -6.384776311))
        make_face()
    extrude(amount=DELETE_FACE_2_DEPTH)

    # 圆角3
    fillet_3_edges = [part.edges().sort_by_distance(p)[0] for p in [
        (14, 3.5, -5.798989873),
        (14, 3.5, 5.798989873),
        (5.798989873, 3.5, 14),
        (-5.798989873, 3.5, 14),
        (-14, 3.5, 5.798989873),
        (-14, 3.5, -5.798989873),
        (-5.798989873, 3.5, -14),
        (5.798989873, 3.5, -14),
    ]]
    fillet(fillet_3_edges, radius=FILLET_3_R)

    # 倒角3
    chamfer_3_edges = [part.edges().sort_by_distance(p)[0] for p in [
        (9.899494937, 2, 9.899494936),
        (9.899494937, 5, 9.899494936),
        (9.899494936, 2, -9.899494937),
        (14, 2, 0),
        (0, 2, 14),
        (-9.899494936, 2, 9.899494937),
        (-14, 2, 0),
        (-9.899494937, 2, -9.899494936),
        (0, 2, -14),
        (-5.688634418, 2, 13.733578364),
        (-13.733578364, 2, 5.688634418),
        (-13.733578364, 2, -5.688634418),
        (-5.688634418, 2, -13.733578364),
        (5.688634418, 2, -13.733578364),
        (13.733578364, 2, -5.688634418),
        (13.733578364, 2, 5.688634418),
        (5.688634418, 2, 13.733578364),
        (0, 5, 14),
        (14, 5, 0),
        (9.899494936, 5, -9.899494937),
        (0, 5, -14),
        (-9.899494937, 5, -9.899494936),
        (-14, 5, 0),
        (-9.899494936, 5, 9.899494937),
        (-5.688634418, 5, 13.733578364),
        (-13.733578364, 5, 5.688634418),
        (-13.733578364, 5, -5.688634418),
        (-5.688634418, 5, -13.733578364),
        (5.688634418, 5, -13.733578364),
        (13.733578364, 5, -5.688634418),
        (13.733578364, 5, 5.688634418),
        (5.688634418, 5, 13.733578364),
    ]]
    chamfer(chamfer_3_edges, length=CHAMFER_3_SIZE)


solid = part.part
